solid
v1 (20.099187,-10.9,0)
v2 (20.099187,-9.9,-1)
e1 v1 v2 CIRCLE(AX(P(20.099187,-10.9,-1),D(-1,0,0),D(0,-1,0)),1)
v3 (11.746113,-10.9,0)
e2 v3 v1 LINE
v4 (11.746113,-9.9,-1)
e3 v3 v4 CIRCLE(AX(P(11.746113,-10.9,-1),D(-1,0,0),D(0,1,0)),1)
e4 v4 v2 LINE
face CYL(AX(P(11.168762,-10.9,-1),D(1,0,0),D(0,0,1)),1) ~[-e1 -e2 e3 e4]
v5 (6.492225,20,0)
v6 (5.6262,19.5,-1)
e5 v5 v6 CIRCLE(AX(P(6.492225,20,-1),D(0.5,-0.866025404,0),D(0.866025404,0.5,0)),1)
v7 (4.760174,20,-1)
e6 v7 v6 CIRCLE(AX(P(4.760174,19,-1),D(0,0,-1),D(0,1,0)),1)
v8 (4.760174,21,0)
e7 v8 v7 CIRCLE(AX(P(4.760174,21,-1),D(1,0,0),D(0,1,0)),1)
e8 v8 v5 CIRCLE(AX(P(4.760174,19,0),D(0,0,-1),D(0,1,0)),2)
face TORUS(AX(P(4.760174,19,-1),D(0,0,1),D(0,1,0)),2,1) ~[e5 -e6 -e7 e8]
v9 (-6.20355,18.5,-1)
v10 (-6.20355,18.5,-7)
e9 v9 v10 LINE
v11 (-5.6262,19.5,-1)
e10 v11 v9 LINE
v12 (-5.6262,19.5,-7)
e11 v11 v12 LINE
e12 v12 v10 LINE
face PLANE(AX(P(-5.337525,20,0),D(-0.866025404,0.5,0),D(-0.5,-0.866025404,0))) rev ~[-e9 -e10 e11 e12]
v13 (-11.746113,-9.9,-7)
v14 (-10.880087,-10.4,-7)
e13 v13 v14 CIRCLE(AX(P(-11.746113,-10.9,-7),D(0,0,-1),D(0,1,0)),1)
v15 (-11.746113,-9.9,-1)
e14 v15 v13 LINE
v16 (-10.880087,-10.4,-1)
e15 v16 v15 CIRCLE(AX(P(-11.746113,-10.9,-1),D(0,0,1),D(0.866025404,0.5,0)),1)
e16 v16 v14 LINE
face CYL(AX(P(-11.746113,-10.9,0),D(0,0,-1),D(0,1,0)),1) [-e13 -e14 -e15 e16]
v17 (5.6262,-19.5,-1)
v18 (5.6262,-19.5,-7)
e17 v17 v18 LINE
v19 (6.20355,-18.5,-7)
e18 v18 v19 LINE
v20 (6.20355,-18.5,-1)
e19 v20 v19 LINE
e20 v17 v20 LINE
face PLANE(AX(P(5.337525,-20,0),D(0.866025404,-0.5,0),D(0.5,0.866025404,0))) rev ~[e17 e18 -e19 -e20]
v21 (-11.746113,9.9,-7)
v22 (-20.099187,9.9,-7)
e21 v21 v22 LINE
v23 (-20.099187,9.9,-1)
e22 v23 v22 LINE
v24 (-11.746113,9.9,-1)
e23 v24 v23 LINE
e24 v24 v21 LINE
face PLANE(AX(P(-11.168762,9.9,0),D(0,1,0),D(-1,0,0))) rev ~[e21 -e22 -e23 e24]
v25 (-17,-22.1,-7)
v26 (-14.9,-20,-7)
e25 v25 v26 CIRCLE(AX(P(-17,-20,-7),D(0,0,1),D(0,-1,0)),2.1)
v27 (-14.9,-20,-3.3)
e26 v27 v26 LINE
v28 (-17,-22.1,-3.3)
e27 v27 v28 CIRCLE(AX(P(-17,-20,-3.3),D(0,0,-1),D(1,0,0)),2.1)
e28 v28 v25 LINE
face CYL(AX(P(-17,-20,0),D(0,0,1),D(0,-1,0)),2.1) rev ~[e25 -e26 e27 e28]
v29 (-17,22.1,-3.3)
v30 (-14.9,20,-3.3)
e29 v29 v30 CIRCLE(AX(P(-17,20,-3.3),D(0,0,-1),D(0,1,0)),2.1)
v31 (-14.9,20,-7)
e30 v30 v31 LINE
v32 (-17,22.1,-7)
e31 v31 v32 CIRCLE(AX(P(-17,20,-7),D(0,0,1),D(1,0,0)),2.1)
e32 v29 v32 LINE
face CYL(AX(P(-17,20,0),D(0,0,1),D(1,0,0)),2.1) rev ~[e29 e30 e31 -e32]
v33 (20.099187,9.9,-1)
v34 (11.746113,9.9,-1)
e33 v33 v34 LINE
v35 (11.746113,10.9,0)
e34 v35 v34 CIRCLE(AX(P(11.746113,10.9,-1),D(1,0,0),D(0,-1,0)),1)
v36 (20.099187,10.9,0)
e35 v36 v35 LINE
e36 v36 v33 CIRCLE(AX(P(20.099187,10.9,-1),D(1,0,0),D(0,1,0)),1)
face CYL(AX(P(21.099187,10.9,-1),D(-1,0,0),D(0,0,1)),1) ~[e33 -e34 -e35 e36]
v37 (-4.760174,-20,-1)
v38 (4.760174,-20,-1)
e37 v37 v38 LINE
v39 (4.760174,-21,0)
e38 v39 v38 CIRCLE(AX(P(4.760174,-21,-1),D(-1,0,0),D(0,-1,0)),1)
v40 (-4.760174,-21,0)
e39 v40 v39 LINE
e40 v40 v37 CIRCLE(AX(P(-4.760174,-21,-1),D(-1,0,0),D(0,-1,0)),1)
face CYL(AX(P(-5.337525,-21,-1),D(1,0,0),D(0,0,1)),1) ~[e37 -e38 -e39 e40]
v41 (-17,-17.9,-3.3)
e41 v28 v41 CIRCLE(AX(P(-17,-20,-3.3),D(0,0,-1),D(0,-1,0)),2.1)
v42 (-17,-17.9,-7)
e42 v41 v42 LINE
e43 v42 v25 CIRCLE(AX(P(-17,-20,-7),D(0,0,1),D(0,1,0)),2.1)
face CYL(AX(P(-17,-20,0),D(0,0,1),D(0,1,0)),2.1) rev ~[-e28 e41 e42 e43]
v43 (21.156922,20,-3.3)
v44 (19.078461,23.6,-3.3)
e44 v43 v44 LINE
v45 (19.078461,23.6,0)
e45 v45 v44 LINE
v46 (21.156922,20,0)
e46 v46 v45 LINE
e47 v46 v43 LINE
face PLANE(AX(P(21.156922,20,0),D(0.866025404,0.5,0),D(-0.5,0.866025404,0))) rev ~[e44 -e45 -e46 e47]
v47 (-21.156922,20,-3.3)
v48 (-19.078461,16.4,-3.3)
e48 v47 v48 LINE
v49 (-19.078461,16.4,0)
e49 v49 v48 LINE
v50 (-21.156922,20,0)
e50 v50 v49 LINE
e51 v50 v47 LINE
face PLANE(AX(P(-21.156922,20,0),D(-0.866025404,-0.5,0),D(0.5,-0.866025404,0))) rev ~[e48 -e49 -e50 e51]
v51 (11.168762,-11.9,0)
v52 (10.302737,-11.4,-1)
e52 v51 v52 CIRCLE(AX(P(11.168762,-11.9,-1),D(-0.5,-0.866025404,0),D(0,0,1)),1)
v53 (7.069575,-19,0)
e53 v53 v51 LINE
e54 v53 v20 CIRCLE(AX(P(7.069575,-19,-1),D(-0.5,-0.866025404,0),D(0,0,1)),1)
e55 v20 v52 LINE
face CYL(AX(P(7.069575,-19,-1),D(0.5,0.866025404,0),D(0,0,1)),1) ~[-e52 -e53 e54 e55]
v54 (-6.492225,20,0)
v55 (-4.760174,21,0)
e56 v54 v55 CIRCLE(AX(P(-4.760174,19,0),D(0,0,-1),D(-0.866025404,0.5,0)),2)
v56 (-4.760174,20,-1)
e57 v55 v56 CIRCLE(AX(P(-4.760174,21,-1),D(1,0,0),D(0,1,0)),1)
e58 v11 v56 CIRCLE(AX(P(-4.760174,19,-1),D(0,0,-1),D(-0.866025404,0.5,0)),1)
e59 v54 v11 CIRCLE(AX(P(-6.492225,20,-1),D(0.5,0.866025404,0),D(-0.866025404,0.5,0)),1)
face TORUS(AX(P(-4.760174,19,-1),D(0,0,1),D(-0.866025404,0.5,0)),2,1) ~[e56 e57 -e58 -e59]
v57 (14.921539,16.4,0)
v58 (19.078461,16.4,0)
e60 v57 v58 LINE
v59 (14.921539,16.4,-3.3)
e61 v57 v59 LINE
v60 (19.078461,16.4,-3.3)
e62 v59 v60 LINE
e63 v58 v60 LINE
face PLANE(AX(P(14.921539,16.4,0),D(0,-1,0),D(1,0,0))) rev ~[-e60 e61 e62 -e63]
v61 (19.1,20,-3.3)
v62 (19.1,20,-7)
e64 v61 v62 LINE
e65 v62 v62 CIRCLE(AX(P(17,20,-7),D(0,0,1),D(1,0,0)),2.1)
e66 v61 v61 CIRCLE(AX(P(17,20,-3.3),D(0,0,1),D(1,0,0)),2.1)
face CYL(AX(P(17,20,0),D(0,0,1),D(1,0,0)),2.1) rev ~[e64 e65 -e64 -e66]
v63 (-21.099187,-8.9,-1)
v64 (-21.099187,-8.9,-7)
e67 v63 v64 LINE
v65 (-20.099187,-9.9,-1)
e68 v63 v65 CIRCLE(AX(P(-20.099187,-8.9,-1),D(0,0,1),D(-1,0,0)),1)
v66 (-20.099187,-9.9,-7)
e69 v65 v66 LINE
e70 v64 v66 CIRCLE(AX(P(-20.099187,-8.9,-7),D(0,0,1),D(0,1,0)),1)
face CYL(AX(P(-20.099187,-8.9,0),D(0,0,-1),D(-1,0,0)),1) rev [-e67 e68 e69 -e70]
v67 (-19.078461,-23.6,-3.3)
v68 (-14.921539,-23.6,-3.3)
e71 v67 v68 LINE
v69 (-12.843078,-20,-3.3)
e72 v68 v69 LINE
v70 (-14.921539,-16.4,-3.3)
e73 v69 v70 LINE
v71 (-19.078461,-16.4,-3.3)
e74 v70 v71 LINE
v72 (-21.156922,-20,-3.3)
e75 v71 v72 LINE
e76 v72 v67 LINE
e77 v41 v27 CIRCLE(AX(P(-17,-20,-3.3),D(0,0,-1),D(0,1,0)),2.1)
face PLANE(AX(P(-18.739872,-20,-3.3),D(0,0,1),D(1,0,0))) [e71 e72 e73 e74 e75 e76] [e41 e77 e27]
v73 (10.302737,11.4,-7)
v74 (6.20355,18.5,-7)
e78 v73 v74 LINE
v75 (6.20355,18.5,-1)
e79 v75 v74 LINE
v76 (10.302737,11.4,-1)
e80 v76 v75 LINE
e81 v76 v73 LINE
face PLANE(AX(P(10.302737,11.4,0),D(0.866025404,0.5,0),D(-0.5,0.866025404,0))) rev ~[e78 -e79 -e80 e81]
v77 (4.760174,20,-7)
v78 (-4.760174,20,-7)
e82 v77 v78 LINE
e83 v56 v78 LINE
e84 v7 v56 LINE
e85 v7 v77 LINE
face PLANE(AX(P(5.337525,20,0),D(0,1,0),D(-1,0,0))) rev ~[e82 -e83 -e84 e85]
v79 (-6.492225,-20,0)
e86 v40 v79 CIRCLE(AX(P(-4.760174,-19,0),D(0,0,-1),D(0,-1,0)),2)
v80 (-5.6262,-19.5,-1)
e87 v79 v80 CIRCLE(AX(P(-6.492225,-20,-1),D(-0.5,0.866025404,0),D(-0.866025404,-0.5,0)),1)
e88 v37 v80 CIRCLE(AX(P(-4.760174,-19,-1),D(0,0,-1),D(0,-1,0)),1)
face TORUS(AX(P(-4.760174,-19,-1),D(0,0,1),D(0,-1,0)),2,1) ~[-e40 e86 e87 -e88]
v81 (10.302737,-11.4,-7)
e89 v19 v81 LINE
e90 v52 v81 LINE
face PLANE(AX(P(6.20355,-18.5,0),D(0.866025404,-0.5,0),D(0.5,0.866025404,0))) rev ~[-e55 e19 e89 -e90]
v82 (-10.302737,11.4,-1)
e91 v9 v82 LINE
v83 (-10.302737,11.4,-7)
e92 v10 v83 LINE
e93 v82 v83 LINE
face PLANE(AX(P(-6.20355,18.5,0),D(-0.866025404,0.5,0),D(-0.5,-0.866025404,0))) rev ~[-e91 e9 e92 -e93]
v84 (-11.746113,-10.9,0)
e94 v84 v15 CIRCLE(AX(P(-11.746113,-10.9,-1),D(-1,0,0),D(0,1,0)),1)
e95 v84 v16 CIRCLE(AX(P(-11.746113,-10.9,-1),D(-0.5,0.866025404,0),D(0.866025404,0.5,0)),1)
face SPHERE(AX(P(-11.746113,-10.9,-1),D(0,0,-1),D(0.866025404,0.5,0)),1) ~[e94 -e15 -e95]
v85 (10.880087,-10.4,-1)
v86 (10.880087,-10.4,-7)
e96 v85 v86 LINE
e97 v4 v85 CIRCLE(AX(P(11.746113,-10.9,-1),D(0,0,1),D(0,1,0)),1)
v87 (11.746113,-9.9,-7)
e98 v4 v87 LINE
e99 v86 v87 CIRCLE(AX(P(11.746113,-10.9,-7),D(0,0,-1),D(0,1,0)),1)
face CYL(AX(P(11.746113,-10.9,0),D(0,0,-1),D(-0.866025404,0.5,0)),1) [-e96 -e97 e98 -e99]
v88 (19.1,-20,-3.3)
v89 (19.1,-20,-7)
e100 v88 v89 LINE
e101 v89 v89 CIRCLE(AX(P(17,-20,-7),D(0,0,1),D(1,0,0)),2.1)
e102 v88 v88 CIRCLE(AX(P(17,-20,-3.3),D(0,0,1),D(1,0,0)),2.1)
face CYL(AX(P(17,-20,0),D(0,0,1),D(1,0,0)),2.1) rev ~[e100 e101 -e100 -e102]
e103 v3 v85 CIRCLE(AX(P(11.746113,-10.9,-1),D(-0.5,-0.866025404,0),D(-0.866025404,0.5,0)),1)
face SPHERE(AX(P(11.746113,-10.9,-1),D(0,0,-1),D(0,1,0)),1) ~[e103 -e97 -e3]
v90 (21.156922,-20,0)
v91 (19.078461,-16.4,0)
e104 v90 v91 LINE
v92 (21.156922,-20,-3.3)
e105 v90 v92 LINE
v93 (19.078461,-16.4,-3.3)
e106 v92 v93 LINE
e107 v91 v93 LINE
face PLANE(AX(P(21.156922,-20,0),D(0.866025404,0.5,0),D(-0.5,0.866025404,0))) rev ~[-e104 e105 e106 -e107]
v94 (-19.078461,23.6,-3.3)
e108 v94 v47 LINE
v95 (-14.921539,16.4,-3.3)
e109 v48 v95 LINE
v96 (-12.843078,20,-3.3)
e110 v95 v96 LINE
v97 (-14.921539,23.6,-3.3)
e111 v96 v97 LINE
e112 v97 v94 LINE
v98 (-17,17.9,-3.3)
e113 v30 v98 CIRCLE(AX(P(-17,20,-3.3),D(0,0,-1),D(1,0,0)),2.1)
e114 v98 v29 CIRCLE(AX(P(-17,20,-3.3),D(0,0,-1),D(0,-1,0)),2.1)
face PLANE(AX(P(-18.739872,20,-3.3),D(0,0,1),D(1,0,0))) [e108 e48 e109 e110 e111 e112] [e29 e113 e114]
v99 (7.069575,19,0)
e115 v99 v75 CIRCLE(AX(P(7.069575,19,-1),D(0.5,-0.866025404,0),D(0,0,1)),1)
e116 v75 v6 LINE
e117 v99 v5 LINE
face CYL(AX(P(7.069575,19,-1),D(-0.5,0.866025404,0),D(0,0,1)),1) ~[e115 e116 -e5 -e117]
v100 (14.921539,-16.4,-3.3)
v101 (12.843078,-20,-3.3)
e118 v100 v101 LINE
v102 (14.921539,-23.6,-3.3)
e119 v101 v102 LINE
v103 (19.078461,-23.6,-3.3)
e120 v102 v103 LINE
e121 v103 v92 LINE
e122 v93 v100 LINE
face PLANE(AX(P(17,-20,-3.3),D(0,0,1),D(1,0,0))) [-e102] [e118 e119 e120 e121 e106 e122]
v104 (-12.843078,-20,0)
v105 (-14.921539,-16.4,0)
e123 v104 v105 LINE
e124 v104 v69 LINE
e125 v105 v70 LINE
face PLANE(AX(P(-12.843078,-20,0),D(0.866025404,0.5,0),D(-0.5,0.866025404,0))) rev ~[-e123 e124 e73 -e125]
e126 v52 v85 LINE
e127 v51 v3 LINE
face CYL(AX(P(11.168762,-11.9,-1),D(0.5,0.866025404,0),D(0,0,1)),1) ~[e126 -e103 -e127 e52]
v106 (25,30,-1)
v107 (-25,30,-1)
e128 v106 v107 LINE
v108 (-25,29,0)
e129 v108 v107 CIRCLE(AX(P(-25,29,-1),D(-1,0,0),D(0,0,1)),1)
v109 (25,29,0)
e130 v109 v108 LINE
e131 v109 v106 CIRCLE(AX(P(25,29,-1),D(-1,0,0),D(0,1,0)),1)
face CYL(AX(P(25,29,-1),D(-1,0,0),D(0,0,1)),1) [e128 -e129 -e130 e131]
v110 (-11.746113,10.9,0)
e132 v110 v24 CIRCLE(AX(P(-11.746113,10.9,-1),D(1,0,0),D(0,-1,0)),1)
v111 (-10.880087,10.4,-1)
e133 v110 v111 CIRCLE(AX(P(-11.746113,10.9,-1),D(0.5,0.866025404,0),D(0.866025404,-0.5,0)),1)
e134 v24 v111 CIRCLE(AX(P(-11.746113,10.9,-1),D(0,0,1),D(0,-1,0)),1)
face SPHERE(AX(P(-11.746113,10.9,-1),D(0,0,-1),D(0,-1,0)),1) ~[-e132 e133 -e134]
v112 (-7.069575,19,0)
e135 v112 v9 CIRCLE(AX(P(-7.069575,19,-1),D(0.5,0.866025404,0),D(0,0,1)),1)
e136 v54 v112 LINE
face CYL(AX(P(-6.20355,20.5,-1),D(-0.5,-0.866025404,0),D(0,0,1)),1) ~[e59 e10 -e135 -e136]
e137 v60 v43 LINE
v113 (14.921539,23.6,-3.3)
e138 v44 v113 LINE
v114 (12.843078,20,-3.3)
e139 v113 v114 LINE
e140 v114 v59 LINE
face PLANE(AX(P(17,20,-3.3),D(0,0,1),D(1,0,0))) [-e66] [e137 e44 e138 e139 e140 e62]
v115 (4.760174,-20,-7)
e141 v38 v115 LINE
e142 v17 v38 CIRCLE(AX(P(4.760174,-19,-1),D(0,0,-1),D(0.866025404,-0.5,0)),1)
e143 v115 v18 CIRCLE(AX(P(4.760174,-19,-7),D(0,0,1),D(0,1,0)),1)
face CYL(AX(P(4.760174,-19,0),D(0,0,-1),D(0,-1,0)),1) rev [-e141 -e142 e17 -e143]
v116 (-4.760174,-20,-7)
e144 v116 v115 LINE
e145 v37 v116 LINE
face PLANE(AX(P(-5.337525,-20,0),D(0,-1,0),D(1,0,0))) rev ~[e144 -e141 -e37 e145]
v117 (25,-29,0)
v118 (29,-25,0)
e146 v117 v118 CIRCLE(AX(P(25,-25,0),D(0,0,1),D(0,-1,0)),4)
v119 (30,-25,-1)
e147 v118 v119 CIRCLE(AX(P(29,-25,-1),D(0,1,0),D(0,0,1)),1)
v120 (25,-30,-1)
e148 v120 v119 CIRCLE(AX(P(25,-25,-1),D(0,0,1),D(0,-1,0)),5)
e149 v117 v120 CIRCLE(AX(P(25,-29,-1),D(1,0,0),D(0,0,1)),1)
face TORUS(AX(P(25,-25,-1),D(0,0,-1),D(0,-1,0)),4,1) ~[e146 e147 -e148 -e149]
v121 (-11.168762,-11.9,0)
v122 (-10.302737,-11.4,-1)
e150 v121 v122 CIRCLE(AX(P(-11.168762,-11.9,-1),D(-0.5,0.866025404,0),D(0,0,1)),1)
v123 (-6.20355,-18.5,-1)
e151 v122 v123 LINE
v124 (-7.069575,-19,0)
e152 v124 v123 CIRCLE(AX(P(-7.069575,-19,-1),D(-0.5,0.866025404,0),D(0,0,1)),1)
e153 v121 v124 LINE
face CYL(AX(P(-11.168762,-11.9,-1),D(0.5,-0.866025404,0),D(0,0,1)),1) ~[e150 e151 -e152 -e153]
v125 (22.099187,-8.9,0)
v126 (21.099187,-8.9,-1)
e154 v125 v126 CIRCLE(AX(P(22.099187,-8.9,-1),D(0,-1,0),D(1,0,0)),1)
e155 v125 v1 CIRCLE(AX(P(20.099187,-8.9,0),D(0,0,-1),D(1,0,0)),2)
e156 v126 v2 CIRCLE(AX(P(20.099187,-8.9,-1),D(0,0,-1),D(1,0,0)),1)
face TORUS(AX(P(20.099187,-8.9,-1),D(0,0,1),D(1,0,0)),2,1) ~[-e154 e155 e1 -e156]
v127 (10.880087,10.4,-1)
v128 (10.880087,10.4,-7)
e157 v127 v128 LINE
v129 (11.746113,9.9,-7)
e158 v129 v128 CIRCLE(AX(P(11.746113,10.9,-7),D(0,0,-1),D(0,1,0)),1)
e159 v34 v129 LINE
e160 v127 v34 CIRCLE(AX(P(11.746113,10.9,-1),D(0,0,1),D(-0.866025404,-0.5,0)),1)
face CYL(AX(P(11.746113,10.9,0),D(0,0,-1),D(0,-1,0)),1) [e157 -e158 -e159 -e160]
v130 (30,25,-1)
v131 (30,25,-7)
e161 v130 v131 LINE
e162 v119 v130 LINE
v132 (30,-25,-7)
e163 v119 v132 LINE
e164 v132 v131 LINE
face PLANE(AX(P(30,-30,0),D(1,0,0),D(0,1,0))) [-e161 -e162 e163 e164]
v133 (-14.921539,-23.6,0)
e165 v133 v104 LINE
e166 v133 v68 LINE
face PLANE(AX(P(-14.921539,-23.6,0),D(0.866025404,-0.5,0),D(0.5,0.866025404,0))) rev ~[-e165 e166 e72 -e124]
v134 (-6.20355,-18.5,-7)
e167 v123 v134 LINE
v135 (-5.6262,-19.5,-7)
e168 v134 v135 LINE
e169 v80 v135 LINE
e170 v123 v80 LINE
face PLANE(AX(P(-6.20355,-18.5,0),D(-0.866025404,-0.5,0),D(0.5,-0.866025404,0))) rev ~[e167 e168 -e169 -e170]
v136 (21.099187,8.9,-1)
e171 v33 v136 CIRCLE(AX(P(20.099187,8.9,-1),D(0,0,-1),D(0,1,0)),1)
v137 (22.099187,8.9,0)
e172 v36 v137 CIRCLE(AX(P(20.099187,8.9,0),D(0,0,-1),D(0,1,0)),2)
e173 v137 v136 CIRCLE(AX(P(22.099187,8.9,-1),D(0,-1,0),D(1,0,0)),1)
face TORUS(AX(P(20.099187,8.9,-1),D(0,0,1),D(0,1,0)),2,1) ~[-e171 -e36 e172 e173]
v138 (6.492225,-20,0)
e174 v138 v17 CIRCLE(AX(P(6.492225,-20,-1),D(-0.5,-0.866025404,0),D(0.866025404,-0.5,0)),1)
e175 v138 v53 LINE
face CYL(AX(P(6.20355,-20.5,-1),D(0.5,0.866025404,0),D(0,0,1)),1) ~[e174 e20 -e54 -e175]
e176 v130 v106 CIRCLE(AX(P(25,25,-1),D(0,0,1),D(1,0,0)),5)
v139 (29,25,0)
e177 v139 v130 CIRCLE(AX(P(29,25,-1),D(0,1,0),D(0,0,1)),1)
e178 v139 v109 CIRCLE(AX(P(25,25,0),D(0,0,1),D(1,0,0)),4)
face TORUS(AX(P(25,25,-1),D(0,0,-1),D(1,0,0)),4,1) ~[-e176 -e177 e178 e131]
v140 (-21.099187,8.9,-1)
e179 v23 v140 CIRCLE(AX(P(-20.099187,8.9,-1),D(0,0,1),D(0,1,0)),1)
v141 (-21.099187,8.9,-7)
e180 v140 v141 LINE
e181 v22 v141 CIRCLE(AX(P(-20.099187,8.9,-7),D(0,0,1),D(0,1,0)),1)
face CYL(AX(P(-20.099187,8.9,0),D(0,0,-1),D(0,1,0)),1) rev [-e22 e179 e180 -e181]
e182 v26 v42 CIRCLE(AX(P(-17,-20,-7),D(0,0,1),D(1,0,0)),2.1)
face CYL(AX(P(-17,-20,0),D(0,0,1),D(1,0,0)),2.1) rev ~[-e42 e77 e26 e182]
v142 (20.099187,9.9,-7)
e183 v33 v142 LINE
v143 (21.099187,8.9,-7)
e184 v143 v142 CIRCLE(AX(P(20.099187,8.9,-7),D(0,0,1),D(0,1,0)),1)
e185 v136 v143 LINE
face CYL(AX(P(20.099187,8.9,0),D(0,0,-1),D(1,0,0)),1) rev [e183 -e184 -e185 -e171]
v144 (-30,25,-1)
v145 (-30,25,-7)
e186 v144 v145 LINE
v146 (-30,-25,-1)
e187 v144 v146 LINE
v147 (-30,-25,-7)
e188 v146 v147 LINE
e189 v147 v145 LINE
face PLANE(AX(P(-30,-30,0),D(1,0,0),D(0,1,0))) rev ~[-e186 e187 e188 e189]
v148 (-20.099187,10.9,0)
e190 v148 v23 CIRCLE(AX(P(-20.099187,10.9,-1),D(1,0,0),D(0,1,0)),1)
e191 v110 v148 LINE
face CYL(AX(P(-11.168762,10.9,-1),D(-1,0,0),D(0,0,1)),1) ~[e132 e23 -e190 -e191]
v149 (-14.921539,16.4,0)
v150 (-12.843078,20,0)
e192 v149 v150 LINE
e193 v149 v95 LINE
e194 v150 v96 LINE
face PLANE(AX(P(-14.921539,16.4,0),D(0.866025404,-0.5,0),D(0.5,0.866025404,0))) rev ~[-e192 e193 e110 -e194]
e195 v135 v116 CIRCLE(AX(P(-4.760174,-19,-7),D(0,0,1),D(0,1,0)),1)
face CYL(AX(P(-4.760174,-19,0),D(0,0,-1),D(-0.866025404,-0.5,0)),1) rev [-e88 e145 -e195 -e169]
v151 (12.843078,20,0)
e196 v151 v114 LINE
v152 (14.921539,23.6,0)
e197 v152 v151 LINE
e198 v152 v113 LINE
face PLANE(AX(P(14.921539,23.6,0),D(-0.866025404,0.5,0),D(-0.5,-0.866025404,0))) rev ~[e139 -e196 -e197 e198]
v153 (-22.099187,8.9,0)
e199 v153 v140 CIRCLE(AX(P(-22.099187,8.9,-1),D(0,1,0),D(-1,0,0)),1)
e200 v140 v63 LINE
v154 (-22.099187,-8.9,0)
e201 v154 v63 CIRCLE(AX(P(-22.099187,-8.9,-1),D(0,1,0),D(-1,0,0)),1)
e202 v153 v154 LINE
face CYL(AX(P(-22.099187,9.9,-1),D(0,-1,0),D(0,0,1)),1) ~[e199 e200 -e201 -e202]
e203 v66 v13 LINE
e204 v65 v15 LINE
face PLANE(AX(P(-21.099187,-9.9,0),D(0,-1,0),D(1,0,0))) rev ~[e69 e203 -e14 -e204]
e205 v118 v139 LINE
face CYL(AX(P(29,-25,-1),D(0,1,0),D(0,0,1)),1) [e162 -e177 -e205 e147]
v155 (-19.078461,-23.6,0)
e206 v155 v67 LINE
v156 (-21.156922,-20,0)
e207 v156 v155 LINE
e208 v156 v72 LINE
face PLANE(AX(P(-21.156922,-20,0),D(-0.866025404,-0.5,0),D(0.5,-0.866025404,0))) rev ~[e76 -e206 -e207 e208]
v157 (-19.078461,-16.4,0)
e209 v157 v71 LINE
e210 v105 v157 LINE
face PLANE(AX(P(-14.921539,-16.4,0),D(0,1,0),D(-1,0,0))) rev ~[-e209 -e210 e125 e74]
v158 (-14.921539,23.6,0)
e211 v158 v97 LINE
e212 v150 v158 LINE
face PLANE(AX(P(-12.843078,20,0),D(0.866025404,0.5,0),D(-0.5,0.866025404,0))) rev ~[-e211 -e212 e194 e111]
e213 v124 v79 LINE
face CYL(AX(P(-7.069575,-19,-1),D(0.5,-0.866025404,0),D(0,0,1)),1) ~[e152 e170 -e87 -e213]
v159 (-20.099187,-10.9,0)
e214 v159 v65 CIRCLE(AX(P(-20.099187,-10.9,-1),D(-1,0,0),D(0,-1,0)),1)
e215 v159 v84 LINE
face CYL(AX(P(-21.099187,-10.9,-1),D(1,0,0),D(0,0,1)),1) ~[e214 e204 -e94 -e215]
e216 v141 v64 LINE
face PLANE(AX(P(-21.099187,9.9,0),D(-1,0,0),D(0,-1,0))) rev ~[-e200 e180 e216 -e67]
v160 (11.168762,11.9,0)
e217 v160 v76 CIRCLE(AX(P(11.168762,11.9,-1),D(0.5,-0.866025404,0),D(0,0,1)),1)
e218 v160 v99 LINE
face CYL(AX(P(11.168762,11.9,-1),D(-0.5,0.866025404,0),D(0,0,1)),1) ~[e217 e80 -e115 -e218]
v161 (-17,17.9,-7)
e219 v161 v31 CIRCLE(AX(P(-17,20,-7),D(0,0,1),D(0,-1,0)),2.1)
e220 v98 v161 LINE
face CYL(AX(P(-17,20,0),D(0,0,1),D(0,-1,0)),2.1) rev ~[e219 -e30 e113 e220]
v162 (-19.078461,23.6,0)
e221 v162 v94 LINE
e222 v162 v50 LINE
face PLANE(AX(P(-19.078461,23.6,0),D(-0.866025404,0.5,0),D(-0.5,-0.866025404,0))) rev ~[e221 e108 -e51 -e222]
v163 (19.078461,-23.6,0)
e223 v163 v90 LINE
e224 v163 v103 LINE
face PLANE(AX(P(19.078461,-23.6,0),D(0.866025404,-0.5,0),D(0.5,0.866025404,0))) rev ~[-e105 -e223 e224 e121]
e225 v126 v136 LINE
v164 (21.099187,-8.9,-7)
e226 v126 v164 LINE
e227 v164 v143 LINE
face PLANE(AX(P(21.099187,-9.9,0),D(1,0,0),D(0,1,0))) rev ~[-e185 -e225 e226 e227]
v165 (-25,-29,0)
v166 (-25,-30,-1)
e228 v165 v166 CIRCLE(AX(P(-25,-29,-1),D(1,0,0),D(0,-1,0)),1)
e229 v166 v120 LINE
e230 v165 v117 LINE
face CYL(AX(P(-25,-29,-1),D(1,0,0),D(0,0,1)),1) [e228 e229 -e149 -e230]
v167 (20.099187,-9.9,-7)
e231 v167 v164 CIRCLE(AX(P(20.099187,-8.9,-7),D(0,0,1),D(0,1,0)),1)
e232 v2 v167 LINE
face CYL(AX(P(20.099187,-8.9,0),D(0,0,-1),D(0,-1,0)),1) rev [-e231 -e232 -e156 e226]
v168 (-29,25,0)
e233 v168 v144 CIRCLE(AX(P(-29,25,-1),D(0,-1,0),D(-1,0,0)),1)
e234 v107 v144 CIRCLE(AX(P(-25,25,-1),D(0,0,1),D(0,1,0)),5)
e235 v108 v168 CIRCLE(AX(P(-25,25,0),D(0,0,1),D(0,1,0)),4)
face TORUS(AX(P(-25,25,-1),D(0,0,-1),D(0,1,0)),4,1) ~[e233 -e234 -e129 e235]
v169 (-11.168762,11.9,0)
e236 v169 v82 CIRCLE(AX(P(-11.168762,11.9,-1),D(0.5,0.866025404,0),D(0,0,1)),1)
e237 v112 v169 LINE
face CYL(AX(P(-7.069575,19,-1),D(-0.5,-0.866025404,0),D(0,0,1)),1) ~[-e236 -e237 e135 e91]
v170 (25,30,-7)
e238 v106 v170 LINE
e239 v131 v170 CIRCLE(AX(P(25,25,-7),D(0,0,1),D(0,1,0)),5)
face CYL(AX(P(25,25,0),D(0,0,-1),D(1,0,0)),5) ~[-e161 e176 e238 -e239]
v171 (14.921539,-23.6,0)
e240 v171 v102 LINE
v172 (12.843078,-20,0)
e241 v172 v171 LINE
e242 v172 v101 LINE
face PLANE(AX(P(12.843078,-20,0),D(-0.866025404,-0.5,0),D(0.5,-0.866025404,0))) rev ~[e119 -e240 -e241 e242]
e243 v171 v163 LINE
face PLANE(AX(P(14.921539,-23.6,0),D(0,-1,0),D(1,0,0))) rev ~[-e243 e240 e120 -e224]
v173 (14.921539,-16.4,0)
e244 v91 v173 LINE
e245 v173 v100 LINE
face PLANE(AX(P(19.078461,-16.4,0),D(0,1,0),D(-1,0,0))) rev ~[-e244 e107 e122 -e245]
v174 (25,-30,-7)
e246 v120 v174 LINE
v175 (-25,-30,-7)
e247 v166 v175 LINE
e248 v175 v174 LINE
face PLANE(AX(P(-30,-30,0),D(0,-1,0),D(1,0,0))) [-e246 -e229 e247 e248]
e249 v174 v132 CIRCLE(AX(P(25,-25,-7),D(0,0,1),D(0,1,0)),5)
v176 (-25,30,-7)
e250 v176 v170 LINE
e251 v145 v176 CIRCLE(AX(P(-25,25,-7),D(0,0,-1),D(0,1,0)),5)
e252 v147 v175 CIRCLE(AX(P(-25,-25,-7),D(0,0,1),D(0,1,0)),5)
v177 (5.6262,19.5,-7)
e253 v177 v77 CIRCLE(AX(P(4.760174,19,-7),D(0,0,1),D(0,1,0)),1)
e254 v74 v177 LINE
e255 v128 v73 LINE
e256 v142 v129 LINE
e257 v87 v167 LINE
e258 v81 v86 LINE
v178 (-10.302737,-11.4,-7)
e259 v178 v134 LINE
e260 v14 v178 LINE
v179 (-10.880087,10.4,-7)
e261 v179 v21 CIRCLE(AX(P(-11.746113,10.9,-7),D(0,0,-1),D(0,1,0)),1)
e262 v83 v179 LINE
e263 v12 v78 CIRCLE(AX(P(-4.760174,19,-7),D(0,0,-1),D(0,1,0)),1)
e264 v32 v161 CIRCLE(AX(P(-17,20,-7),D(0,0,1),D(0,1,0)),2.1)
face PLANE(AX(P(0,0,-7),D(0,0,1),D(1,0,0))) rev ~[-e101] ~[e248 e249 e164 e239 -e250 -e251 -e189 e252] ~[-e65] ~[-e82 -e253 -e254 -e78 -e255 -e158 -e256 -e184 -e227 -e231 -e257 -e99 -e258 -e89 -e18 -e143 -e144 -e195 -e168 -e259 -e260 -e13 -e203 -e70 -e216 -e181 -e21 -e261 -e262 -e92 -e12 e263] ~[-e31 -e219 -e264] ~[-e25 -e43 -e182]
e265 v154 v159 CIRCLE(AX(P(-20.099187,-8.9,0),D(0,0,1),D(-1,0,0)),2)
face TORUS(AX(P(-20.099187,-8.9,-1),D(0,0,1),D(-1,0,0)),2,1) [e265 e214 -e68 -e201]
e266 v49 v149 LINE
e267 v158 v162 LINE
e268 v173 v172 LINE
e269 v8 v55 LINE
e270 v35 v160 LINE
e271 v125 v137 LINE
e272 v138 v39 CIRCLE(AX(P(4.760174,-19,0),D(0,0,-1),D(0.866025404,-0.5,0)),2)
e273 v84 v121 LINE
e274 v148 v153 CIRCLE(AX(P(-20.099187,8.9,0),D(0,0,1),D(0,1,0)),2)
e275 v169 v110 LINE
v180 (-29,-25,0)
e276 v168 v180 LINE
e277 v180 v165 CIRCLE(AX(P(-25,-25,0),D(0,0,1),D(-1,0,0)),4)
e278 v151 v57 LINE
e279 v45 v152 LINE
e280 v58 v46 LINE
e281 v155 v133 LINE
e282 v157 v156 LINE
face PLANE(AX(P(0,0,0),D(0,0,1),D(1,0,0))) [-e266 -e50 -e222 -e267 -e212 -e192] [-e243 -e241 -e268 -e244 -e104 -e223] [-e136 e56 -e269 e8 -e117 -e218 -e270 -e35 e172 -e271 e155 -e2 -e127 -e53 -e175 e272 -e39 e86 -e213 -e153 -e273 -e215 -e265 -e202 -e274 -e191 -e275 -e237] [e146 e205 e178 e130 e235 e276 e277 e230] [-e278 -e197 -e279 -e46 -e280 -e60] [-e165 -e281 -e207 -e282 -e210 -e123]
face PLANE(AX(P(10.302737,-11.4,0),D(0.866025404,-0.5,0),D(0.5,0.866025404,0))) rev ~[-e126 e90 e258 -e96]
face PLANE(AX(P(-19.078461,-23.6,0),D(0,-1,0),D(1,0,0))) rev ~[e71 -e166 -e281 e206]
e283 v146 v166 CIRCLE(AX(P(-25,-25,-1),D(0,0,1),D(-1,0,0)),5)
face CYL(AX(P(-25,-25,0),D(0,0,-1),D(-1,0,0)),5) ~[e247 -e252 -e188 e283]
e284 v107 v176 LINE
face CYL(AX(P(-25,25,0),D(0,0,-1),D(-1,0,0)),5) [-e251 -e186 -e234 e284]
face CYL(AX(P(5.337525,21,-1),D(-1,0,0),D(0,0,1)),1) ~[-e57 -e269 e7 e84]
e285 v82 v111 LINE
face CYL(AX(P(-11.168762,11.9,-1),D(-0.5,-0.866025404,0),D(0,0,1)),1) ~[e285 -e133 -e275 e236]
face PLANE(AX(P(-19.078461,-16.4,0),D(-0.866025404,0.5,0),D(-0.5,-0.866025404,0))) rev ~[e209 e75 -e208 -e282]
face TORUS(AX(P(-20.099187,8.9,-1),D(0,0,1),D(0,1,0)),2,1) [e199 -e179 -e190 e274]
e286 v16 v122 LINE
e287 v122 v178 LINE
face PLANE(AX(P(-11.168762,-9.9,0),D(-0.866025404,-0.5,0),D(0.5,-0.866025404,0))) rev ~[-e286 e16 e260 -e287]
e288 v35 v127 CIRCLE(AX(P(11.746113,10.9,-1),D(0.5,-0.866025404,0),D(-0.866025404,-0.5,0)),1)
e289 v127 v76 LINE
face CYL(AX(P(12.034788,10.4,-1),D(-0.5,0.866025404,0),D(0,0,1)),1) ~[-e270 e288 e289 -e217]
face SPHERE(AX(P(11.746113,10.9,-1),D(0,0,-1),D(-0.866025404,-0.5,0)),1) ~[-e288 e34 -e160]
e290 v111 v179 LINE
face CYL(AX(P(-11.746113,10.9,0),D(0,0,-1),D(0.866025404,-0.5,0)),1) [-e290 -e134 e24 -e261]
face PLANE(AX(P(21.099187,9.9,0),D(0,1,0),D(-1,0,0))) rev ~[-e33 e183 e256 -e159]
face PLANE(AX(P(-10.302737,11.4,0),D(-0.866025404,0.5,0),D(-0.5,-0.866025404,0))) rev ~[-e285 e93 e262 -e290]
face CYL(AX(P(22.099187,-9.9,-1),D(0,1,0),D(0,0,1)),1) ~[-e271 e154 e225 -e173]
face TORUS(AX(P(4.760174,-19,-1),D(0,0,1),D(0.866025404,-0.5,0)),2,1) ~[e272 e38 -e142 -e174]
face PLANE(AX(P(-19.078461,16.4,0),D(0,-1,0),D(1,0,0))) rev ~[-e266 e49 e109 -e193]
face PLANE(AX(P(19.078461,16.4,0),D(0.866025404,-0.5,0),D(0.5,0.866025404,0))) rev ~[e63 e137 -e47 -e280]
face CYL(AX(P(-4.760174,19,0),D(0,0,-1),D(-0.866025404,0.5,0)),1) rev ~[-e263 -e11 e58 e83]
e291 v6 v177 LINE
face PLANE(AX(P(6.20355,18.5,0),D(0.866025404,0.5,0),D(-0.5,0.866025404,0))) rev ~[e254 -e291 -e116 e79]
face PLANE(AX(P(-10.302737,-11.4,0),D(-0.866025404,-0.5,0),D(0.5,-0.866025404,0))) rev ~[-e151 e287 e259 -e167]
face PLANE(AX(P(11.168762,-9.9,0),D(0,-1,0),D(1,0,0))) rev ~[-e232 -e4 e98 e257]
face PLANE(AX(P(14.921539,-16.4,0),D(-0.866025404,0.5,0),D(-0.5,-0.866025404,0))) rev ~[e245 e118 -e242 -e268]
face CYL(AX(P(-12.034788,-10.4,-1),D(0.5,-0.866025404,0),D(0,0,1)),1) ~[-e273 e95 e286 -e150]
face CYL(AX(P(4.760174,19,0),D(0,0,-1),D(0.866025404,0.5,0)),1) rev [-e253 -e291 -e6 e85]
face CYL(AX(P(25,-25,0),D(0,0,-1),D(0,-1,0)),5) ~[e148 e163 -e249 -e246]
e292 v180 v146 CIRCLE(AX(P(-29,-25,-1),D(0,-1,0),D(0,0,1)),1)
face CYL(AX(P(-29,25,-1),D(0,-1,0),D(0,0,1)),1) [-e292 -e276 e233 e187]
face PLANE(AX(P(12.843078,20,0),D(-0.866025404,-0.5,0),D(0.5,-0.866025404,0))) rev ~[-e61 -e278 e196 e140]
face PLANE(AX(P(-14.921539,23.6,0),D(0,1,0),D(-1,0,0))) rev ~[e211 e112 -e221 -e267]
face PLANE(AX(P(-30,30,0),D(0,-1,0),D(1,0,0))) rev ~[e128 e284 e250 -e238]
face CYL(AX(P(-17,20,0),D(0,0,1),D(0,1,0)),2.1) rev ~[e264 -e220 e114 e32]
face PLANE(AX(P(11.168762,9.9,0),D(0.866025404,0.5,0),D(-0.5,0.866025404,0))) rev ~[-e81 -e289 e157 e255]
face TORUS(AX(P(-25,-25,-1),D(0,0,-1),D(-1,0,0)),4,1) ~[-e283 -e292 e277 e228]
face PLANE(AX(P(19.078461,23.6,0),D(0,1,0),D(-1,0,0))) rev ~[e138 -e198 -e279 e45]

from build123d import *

# Parameters (mm, degrees)
F0_W     = 60
F0_H     = 60
F1_DEPTH = 7
F2_R     = 5
F3_R     = 2.1
F4_DEPTH = 25
F5_DEPTH = 3.3
F6_R     = 1
F7_DEPTH = 25
F8_R     = 1


# Not quite as in the source:
# - a feature names something its author has since deleted; it is built from what else it names


with BuildPart() as f1:
    # F0 (on Top) → F1 (new body)
    with BuildSketch(Plane.XY):
        Rectangle(F0_W, F0_H)
    extrude(amount=-F1_DEPTH)

    # F2
    f2_edges = [f1.edges().sort_by_distance(p)[0] for p in [
        (-30, 30, -3.5),
        (30, 30, -3.5),
        (30, -30, -3.5),
        (-30, -30, -3.5),
    ]]
    fillet(f2_edges, radius=F2_R)

    # F3 (on face) → F4 (cut)
    with BuildSketch(Plane.XY):
        with BuildLine():
            Line((-17, 17.9), (-17, 22.1))
            ThreePointArc((-17, 22.1), (-19.1, 20), (-17, 17.9))
        make_face()
        with BuildLine():
            ThreePointArc((-17, 17.9), (-15.5150757595, 18.5150757595), (-14.9, 20))
            ThreePointArc((-14.9, 20), (-15.5150757595, 21.4849242405), (-17, 22.1))
            Line((-17, 22.1), (-17, 17.9))
        make_face()
        with Locations((17, 20)):
            Circle(F3_R)
        with Locations((17, -20)):
            Circle(F3_R)
        with BuildLine():
            Line((-17, -22.1), (-17, -17.9))
            ThreePointArc((-17, -17.9), (-19.1, -20), (-17, -22.1))
        make_face()
        with BuildLine():
            ThreePointArc((-17, -22.1), (-15.5150757595, -21.4849242405), (-14.9, -20))
            ThreePointArc((-14.9, -20), (-15.5150757595, -18.5150757595), (-17, -17.9))
            Line((-17, -17.9), (-17, -22.1))
        make_face()
    extrude(amount=-F4_DEPTH, mode=Mode.SUBTRACT)

    # F3 (on face) → F5 (cut)
    with BuildSketch(Plane.XY):
        with BuildLine():
            ThreePointArc((-17, 17.9), (-19.1, 20), (-17, 22.1))
            Line((-17, 22.1), (-17, 23.6))
            Line((-17, 23.6), (-19.0784609691, 23.6))
            Line((-19.0784609691, 23.6), (-21.1569219382, 20))
            Line((-21.1569219382, 20), (-19.0784609691, 16.4))
            Line((-19.0784609691, 16.4), (-17, 16.4))
            Line((-17, 16.4), (-17, 17.9))
        make_face()
        with BuildLine():
            ThreePointArc((-17, 22.1), (-15.5150757595, 21.4849242405), (-14.9, 20))
            ThreePointArc((-14.9, 20), (-15.5150757595, 18.5150757595), (-17, 17.9))
            Line((-17, 17.9), (-17, 16.4))
            Line((-17, 16.4), (-14.9215390309, 16.4))
            Line((-14.9215390309, 16.4), (-12.8430780618, 20))
            Line((-12.8430780618, 20), (-14.9215390309, 23.6))
            Line((-14.9215390309, 23.6), (-17, 23.6))
            Line((-17, 23.6), (-17, 22.1))
        make_face()
        Polygon((19.0784609691, 23.6), (14.9215390309, 23.6), (12.8430780618, 20), (14.9215390309, 16.4), (19.0784609691, 16.4), (21.1569219382, 20), align=None)
        with Locations((17, 20)):
            Circle(F3_R, mode=Mode.SUBTRACT)
        with BuildLine():
            ThreePointArc((-17, -22.1), (-19.1, -20), (-17, -17.9))
            Line((-17, -17.9), (-17, -16.4))
            Line((-17, -16.4), (-19.0784609691, -16.4))
            Line((-19.0784609691, -16.4), (-21.1569219382, -20))
            Line((-21.1569219382, -20), (-19.0784609691, -23.6))
            Line((-19.0784609691, -23.6), (-17, -23.6))
            Line((-17, -23.6), (-17, -22.1))
        make_face()
        with BuildLine():
            ThreePointArc((-17, -17.9), (-15.5150757595, -18.5150757595), (-14.9, -20))
            ThreePointArc((-14.9, -20), (-15.5150757595, -21.4849242405), (-17, -22.1))
            Line((-17, -22.1), (-17, -23.6))
            Line((-17, -23.6), (-14.9215390309, -23.6))
            Line((-14.9215390309, -23.6), (-12.8430780618, -20))
            Line((-12.8430780618, -20), (-14.9215390309, -16.4))
            Line((-14.9215390309, -16.4), (-17, -16.4))
            Line((-17, -16.4), (-17, -17.9))
        make_face()
        Polygon((19.0784609691, -23.6), (21.1569219382, -20), (19.0784609691, -16.4), (14.9215390309, -16.4), (12.8430780618, -20), (14.9215390309, -23.6), align=None)
        with Locations((17, -20)):
            Circle(F3_R, mode=Mode.SUBTRACT)
    extrude(amount=-F5_DEPTH, mode=Mode.SUBTRACT)

    # F6
    f6_edges = [f1.edges().sort_by_distance(p)[0] for p in [
        (30, 0, 0),
        (0, 30, 0),
        (-30, 0, 0),
        (0, -30, 0),
        (-28.535534, -28.535534, 0),
        (28.535534, -28.535534, 0),
        (28.535534, 28.535534, 0),
        (-28.535534, 28.535534, 0),
    ]]
    fillet(f6_edges, radius=F6_R)

    # F3 (on face) → F7 (cut)
    with BuildSketch(Plane.XY):
        Polygon((-5.3375245624, 20), (-6.2035499662, 18.5), (-10.3027368774, 11.4), (-11.1687622812, 9.9), (-12.9008130888, 9.9), (-21.0991869112, 9.9), (-21.0991869112, -9.9), (-12.9008130888, -9.9), (-11.1687622812, -9.9), (-10.3027368774, -11.4), (-6.2035499662, -18.5), (-5.3375245624, -20), (5.3375245624, -20), (6.2035499662, -18.5), (10.3027368774, -11.4), (11.1687622812, -9.9), (12.9008130888, -9.9), (21.0991869112, -9.9), (21.0991869112, 9.9), (12.9008130888, 9.9), (11.1687622812, 9.9), (10.3027368774, 11.4), (6.2035499662, 18.5), (5.3375245624, 20), (0, 20), align=None)
    extrude(amount=-F7_DEPTH, mode=Mode.SUBTRACT)

    # F8
    f8_edges = [f1.edges().sort_by_distance(p)[0] for p in [
        (-16.133975, 9.9, 0),
        (-21.099187, 0, 0),
        (-8.253143, 14.95, 0),
        (0, 20, 0),
        (8.253143, 14.95, 0),
        (16.133975, 9.9, 0),
        (21.099187, 0, 0),
        (16.133975, -9.9, 0),
        (8.253143, -14.95, 0),
        (0, -20, 0),
        (-8.253143, -14.95, 0),
        (-16.133975, -9.9, 0),
        (-11.168762, 9.9, -3.5),
        (-5.337525, 20, -3.5),
        (5.337525, 20, -3.5),
        (11.168762, 9.9, -3.5),
        (21.099187, 9.9, -3.5),
        (21.099187, -9.9, -3.5),
        (11.168762, -9.9, -3.5),
        (5.337525, -20, -3.5),
        (-5.337525, -20, -3.5),
        (-11.168762, -9.9, -3.5),
        (-21.099187, -9.9, -3.5),
        (-21.099187, 9.9, -3.5),
    ]]
    fillet(f8_edges, radius=F8_R)


solid = f1.part
